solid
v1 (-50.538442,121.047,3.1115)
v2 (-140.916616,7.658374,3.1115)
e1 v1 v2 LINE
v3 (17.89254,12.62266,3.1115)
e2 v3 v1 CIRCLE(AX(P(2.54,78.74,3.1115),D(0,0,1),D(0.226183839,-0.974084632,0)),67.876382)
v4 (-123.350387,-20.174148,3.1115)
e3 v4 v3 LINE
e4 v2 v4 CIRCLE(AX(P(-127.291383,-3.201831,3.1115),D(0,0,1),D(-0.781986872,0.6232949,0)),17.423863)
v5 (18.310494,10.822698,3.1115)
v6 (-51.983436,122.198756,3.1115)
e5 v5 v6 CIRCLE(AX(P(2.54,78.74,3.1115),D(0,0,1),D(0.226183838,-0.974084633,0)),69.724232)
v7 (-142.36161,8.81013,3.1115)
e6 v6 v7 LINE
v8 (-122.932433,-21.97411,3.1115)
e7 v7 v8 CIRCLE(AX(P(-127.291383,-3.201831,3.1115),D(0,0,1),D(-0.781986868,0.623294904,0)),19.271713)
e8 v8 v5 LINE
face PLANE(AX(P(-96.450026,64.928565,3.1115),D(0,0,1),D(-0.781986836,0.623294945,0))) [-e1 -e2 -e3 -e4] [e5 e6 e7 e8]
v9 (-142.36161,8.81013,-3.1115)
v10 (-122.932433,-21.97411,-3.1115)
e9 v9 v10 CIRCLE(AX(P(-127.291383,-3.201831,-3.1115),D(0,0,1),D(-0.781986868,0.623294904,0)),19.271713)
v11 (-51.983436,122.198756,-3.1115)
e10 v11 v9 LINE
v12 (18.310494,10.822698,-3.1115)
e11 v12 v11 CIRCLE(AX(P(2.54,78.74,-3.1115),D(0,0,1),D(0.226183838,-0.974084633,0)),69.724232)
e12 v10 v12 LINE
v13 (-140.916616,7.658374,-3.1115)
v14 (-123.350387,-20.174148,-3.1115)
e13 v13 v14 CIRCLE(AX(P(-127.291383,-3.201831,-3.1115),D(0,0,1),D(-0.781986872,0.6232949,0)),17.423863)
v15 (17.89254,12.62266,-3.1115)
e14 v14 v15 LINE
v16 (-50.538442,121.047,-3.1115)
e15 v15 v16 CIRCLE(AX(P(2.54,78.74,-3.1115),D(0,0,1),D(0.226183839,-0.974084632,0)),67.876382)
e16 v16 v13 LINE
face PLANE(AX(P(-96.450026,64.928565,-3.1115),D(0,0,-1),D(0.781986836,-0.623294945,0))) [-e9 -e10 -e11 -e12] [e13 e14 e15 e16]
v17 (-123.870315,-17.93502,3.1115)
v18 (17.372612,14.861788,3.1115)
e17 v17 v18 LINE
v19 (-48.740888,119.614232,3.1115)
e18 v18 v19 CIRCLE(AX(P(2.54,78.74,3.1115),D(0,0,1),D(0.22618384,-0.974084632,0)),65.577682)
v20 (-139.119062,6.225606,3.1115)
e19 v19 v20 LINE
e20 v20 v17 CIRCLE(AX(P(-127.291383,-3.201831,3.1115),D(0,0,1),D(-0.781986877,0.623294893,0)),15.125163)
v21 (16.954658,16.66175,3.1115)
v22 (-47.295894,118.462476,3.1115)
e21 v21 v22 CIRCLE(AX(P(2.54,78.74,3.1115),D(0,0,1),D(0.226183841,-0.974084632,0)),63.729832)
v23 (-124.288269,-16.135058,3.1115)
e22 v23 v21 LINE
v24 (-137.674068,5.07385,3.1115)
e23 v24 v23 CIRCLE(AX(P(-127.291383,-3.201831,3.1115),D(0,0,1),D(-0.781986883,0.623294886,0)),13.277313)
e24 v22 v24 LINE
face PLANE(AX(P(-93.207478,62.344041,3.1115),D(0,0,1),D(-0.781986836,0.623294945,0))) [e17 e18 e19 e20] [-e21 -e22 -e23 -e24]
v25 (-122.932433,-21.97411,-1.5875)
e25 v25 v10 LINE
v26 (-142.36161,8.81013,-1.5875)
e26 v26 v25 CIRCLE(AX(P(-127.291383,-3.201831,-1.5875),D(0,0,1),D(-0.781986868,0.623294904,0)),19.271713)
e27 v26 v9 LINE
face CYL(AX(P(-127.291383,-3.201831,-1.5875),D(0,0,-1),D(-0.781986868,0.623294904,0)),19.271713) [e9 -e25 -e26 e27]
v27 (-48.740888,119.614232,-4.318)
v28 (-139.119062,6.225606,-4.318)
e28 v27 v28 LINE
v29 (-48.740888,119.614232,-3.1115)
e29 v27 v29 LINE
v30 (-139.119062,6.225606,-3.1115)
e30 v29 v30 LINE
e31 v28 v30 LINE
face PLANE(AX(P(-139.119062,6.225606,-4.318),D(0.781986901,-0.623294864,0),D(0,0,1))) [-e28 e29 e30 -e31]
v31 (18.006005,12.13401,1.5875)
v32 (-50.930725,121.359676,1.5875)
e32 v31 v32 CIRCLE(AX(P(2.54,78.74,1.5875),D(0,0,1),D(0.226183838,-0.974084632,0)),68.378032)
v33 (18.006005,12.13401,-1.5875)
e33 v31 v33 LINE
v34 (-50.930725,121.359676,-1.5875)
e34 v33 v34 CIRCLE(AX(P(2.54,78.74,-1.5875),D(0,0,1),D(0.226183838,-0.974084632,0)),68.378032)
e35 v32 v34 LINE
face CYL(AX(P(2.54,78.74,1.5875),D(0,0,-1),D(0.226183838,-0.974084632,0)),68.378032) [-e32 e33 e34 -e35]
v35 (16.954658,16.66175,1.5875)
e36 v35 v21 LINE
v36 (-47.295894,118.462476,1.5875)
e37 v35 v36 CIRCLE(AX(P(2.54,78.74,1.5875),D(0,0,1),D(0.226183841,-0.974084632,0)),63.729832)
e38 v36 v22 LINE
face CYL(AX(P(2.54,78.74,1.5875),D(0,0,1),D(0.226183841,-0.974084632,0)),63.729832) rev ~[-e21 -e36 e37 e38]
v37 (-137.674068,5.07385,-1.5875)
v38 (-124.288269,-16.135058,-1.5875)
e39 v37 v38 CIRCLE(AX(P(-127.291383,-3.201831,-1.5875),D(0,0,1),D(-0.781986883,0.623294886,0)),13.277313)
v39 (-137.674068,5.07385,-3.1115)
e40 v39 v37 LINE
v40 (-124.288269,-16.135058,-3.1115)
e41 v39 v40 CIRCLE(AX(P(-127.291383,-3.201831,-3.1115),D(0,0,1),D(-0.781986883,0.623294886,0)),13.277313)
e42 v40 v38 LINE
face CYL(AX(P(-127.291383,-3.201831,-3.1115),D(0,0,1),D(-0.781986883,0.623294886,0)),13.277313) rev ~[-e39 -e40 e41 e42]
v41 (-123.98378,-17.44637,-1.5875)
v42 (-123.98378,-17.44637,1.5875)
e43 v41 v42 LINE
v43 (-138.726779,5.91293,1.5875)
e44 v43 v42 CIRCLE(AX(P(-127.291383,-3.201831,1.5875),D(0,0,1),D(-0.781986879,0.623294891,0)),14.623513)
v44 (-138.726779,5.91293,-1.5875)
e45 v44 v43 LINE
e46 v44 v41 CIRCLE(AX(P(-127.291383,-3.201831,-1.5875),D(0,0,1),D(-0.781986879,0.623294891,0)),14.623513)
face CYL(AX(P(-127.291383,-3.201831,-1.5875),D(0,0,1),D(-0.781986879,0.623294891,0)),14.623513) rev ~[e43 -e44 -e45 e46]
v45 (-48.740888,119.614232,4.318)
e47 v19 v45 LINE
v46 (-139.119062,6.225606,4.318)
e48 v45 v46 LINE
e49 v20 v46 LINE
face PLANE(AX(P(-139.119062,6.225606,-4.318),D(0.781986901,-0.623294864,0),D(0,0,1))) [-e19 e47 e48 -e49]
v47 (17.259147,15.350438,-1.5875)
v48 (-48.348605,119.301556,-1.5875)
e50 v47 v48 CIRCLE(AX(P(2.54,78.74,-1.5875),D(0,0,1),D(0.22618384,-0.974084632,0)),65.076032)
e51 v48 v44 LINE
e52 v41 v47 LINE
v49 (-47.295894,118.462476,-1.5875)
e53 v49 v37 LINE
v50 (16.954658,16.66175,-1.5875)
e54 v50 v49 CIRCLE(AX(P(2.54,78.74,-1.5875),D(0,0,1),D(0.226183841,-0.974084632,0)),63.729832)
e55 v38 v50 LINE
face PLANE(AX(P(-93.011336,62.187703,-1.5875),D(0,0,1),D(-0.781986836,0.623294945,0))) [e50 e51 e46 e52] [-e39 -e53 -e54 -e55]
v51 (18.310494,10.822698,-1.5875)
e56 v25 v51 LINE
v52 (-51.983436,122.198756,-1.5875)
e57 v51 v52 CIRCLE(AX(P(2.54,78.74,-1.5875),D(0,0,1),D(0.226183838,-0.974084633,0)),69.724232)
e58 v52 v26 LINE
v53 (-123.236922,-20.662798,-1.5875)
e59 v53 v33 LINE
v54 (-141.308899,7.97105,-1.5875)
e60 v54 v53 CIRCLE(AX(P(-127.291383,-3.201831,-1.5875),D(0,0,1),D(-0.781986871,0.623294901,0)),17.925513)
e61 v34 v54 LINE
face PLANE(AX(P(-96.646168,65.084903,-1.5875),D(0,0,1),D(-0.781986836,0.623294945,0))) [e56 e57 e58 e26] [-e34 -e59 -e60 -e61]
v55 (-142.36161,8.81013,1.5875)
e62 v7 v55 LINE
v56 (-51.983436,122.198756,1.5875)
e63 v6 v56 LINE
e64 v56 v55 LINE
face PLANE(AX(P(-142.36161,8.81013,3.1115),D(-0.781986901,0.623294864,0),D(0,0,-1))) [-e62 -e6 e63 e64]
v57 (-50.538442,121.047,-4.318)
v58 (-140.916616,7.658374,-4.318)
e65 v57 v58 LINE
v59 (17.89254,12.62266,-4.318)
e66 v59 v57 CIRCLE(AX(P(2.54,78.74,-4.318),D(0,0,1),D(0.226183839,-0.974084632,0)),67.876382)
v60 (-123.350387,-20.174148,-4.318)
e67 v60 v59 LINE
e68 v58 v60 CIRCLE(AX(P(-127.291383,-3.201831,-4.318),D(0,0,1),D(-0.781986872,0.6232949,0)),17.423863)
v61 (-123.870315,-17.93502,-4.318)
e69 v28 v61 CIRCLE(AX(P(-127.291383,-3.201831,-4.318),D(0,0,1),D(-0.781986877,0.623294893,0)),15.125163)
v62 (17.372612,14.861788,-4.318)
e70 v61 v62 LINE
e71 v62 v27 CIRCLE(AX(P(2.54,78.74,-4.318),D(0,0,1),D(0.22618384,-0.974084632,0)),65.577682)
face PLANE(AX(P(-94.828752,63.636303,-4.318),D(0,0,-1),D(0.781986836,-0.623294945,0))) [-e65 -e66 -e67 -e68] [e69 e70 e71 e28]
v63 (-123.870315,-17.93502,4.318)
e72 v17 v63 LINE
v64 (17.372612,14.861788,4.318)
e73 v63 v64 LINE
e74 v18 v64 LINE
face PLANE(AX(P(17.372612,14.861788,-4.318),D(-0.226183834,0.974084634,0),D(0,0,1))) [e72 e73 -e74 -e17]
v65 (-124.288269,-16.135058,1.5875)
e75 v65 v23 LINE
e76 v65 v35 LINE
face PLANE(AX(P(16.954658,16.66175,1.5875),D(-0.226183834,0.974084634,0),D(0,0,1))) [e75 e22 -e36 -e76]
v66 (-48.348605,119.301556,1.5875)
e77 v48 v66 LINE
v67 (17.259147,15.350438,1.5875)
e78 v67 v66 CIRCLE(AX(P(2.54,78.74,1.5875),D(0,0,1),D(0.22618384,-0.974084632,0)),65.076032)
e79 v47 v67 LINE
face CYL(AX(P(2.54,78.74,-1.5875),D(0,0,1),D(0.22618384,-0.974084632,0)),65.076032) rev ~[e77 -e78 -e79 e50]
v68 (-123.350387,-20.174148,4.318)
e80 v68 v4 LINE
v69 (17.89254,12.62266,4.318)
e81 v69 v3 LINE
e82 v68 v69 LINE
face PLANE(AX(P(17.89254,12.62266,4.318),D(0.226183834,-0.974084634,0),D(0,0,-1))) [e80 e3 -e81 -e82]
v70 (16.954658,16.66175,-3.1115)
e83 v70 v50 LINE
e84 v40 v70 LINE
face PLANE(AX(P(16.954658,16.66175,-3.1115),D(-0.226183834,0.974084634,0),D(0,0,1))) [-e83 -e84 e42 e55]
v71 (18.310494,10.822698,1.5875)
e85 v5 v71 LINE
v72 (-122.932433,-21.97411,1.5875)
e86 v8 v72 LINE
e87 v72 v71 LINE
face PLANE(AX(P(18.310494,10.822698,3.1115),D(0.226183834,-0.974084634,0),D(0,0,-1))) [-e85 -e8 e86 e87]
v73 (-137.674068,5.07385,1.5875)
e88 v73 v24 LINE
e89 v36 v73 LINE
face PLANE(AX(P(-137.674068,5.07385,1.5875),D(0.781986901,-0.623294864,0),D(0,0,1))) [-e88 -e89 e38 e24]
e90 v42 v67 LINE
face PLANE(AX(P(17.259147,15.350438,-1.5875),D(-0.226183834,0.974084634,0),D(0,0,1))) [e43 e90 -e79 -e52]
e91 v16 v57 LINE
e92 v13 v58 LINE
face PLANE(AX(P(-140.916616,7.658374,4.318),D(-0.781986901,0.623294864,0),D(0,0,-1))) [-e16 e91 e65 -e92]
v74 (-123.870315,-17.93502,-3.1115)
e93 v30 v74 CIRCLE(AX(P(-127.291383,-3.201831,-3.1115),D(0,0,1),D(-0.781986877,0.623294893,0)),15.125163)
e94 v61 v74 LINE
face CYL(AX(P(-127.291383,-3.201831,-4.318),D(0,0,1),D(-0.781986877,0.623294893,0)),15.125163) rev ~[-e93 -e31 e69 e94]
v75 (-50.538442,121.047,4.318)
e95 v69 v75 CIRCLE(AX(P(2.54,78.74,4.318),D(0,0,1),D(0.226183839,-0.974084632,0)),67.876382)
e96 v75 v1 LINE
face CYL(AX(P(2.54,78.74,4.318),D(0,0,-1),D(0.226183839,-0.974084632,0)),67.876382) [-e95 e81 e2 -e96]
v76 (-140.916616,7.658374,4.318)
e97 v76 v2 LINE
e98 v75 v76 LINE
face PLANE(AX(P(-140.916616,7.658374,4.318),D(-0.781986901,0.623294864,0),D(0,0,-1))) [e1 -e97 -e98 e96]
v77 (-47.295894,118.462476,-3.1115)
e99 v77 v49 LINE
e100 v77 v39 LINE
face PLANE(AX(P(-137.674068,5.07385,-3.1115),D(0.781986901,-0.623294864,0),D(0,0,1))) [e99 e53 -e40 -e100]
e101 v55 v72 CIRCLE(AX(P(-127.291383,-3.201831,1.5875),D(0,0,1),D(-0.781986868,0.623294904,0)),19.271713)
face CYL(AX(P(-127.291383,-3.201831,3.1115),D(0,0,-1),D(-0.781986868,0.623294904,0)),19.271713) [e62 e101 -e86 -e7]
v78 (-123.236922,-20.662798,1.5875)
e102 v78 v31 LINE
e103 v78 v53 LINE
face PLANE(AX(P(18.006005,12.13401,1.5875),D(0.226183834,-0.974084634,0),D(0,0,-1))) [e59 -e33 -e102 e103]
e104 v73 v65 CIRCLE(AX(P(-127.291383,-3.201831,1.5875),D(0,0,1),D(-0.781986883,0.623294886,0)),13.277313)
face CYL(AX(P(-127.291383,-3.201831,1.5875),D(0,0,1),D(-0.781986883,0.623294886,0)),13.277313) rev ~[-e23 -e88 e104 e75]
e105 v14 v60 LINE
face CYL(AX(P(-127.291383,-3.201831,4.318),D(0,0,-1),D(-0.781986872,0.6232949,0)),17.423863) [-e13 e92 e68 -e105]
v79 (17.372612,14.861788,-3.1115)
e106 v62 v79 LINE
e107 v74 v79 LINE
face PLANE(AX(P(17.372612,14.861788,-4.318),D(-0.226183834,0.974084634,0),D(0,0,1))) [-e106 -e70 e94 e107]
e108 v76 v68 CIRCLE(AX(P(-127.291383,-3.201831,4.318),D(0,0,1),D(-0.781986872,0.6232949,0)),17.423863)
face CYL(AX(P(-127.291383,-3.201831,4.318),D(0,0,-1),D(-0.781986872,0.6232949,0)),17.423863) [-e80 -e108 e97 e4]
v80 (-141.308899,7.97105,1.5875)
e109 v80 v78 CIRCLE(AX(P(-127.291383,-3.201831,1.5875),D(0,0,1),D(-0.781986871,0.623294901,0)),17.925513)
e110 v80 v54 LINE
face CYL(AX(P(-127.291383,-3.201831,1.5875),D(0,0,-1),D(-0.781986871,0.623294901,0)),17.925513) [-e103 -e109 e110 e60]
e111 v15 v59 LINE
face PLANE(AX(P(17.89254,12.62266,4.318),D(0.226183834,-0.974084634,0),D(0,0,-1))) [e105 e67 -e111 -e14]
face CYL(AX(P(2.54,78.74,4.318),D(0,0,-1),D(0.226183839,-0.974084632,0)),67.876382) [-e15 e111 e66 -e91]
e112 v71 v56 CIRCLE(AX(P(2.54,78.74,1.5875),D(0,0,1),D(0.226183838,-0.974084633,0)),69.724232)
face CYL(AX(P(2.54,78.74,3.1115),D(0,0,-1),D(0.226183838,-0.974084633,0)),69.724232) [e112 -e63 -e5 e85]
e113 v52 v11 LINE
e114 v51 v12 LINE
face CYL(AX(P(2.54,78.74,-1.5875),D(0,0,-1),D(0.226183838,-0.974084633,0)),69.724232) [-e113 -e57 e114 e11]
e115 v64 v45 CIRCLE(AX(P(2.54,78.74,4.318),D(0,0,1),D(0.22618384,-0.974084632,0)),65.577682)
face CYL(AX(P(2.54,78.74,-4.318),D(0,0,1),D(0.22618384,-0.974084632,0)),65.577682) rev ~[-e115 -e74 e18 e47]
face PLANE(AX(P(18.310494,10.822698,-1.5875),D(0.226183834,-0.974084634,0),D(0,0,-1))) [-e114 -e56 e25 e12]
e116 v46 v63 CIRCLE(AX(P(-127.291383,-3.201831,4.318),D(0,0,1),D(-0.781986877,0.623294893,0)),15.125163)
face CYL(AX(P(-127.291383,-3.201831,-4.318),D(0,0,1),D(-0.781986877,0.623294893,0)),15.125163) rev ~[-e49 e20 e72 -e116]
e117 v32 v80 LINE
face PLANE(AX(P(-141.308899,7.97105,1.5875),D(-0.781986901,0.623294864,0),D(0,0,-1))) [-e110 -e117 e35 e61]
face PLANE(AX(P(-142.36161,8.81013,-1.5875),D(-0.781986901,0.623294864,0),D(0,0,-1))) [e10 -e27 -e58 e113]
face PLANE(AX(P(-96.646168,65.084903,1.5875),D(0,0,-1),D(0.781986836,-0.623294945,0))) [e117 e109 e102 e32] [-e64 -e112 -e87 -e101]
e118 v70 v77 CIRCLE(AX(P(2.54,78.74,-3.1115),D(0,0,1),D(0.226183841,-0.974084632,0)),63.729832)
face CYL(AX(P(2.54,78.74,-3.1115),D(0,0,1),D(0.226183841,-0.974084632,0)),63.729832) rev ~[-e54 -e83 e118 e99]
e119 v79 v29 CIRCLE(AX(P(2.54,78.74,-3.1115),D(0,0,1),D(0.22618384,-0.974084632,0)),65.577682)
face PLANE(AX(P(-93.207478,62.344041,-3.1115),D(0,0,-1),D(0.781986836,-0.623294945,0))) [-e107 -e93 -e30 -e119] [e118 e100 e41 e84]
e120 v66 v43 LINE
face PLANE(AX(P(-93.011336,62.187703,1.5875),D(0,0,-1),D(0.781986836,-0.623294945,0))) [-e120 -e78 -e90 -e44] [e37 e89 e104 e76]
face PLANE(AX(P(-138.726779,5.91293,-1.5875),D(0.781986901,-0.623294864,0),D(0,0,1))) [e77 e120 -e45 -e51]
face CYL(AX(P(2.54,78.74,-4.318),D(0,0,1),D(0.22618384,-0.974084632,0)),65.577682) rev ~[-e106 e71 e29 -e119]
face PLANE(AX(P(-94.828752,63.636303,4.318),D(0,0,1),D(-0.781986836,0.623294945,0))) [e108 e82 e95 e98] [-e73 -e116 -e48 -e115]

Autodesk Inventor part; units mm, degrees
ref_plane "Work Plane2" through (-127.291383, -3.201831, 0) normal (-1, 0, 0) x (0, 0, 1)
ref_plane "Work Plane3" through (2.54, 78.74, 0) normal (-0.656304, -0.7544966, 0) x (0, 0, 1)
sketch "Path" plane through (0, 0, 0) normal (0, 0, 1) x (1, 0, 0)
  arc A0 (-140.017839, 6.94199) -> (-123.610351, -19.054584) centre (-127.291383, -3.201831) ccw
  arc A1 (17.632576, 13.742224) -> (-49.639665, 120.330616) centre (2.54, 78.74) ccw
  line L0 (17.632576, 13.742224) -> (-123.610351, -19.054584)
  line L1 (-140.017839, 6.94199) -> (-49.639665, 120.330616)
ref_plane "Section Plane" through (-123.610351, -19.054584, 0) normal (0.9740846, 0.2261838, 0) x (0, 0, 1)
sketch "Section Sketch" plane through (-123.610351, -19.054584, 0) normal (0.9740846, 0.2261838, 0) x (0, 0, 1)
  line L0 (-4.318, -1.14935) -> (4.318, -1.14935)
  line L1 (4.318, -1.14935) -> (4.318, 1.14935)
  line L2 (4.318, 1.14935) -> (-4.318, 1.14935)
  line L3 (-4.318, 1.14935) -> (-4.318, -1.14935)
  line L4 (-1.5875, -1.651) -> (1.5875, -1.651)
  line L5 (1.5875, -1.651) -> (1.5875, 1.651)
  line L6 (1.5875, 1.651) -> (-1.5875, 1.651)
  line L7 (-1.5875, 1.651) -> (-1.5875, -1.651)
  line L8 (-1.5875, 0) -> (1.5875, 0) construction
  line L9 (-3.1115, -2.9972) -> (-1.5875, -2.9972)
  line L10 (-1.5875, -2.9972) -> (-1.5875, 2.9972)
  line L11 (-1.5875, 2.9972) -> (-3.1115, 2.9972)
  line L12 (-3.1115, 2.9972) -> (-3.1115, -2.9972)
  line L13 (1.5875, -2.9972) -> (3.1115, -2.9972)
  line L14 (3.1115, -2.9972) -> (3.1115, 2.9972)
  line L15 (3.1115, 2.9972) -> (1.5875, 2.9972)
  line L16 (1.5875, 2.9972) -> (1.5875, -2.9972)
  line L17 (-4.318, 0) -> (4.318, 0) construction
  point P0 (0, 0)
  point P1 (0, 0)
  dimension "d21" = 2.2987
  dimension "d22" = 3.302
  dimension "d23" = 3.175
  dimension "d24" = 1.524
  dimension "d31" = 5.9944
  dimension "d32" = 8.636
sweep "Solid" add profiles "Section Sketch" path "Path"
pattern_of_one "Strand Pattern"
equation "\"d21\" = da_d2"
equation "\"d22\" = da_d1"
equation "\"d23\" = da_b1"
equation "\"d24\" = da_t1 + da_t2"
equation "\"d30\" = da_pt"
equation "\"da_p\" = 6.35"
equation "\"da_b1\" = 3.175"
equation "\"da_h2\" = 5.9944"
equation "\"da_h3\" = 5.207"
equation "\"da_d1\" = 3.302"
equation "\"da_d2\" = 2.2987"
equation "\"da_pt\" = 6.4008"
equation "\"da_b\" = 8.636"
equation "\"da_t1\" = 0.762"
equation "\"da_t2\" = 0.762"
properties part number "Roller Chain"
